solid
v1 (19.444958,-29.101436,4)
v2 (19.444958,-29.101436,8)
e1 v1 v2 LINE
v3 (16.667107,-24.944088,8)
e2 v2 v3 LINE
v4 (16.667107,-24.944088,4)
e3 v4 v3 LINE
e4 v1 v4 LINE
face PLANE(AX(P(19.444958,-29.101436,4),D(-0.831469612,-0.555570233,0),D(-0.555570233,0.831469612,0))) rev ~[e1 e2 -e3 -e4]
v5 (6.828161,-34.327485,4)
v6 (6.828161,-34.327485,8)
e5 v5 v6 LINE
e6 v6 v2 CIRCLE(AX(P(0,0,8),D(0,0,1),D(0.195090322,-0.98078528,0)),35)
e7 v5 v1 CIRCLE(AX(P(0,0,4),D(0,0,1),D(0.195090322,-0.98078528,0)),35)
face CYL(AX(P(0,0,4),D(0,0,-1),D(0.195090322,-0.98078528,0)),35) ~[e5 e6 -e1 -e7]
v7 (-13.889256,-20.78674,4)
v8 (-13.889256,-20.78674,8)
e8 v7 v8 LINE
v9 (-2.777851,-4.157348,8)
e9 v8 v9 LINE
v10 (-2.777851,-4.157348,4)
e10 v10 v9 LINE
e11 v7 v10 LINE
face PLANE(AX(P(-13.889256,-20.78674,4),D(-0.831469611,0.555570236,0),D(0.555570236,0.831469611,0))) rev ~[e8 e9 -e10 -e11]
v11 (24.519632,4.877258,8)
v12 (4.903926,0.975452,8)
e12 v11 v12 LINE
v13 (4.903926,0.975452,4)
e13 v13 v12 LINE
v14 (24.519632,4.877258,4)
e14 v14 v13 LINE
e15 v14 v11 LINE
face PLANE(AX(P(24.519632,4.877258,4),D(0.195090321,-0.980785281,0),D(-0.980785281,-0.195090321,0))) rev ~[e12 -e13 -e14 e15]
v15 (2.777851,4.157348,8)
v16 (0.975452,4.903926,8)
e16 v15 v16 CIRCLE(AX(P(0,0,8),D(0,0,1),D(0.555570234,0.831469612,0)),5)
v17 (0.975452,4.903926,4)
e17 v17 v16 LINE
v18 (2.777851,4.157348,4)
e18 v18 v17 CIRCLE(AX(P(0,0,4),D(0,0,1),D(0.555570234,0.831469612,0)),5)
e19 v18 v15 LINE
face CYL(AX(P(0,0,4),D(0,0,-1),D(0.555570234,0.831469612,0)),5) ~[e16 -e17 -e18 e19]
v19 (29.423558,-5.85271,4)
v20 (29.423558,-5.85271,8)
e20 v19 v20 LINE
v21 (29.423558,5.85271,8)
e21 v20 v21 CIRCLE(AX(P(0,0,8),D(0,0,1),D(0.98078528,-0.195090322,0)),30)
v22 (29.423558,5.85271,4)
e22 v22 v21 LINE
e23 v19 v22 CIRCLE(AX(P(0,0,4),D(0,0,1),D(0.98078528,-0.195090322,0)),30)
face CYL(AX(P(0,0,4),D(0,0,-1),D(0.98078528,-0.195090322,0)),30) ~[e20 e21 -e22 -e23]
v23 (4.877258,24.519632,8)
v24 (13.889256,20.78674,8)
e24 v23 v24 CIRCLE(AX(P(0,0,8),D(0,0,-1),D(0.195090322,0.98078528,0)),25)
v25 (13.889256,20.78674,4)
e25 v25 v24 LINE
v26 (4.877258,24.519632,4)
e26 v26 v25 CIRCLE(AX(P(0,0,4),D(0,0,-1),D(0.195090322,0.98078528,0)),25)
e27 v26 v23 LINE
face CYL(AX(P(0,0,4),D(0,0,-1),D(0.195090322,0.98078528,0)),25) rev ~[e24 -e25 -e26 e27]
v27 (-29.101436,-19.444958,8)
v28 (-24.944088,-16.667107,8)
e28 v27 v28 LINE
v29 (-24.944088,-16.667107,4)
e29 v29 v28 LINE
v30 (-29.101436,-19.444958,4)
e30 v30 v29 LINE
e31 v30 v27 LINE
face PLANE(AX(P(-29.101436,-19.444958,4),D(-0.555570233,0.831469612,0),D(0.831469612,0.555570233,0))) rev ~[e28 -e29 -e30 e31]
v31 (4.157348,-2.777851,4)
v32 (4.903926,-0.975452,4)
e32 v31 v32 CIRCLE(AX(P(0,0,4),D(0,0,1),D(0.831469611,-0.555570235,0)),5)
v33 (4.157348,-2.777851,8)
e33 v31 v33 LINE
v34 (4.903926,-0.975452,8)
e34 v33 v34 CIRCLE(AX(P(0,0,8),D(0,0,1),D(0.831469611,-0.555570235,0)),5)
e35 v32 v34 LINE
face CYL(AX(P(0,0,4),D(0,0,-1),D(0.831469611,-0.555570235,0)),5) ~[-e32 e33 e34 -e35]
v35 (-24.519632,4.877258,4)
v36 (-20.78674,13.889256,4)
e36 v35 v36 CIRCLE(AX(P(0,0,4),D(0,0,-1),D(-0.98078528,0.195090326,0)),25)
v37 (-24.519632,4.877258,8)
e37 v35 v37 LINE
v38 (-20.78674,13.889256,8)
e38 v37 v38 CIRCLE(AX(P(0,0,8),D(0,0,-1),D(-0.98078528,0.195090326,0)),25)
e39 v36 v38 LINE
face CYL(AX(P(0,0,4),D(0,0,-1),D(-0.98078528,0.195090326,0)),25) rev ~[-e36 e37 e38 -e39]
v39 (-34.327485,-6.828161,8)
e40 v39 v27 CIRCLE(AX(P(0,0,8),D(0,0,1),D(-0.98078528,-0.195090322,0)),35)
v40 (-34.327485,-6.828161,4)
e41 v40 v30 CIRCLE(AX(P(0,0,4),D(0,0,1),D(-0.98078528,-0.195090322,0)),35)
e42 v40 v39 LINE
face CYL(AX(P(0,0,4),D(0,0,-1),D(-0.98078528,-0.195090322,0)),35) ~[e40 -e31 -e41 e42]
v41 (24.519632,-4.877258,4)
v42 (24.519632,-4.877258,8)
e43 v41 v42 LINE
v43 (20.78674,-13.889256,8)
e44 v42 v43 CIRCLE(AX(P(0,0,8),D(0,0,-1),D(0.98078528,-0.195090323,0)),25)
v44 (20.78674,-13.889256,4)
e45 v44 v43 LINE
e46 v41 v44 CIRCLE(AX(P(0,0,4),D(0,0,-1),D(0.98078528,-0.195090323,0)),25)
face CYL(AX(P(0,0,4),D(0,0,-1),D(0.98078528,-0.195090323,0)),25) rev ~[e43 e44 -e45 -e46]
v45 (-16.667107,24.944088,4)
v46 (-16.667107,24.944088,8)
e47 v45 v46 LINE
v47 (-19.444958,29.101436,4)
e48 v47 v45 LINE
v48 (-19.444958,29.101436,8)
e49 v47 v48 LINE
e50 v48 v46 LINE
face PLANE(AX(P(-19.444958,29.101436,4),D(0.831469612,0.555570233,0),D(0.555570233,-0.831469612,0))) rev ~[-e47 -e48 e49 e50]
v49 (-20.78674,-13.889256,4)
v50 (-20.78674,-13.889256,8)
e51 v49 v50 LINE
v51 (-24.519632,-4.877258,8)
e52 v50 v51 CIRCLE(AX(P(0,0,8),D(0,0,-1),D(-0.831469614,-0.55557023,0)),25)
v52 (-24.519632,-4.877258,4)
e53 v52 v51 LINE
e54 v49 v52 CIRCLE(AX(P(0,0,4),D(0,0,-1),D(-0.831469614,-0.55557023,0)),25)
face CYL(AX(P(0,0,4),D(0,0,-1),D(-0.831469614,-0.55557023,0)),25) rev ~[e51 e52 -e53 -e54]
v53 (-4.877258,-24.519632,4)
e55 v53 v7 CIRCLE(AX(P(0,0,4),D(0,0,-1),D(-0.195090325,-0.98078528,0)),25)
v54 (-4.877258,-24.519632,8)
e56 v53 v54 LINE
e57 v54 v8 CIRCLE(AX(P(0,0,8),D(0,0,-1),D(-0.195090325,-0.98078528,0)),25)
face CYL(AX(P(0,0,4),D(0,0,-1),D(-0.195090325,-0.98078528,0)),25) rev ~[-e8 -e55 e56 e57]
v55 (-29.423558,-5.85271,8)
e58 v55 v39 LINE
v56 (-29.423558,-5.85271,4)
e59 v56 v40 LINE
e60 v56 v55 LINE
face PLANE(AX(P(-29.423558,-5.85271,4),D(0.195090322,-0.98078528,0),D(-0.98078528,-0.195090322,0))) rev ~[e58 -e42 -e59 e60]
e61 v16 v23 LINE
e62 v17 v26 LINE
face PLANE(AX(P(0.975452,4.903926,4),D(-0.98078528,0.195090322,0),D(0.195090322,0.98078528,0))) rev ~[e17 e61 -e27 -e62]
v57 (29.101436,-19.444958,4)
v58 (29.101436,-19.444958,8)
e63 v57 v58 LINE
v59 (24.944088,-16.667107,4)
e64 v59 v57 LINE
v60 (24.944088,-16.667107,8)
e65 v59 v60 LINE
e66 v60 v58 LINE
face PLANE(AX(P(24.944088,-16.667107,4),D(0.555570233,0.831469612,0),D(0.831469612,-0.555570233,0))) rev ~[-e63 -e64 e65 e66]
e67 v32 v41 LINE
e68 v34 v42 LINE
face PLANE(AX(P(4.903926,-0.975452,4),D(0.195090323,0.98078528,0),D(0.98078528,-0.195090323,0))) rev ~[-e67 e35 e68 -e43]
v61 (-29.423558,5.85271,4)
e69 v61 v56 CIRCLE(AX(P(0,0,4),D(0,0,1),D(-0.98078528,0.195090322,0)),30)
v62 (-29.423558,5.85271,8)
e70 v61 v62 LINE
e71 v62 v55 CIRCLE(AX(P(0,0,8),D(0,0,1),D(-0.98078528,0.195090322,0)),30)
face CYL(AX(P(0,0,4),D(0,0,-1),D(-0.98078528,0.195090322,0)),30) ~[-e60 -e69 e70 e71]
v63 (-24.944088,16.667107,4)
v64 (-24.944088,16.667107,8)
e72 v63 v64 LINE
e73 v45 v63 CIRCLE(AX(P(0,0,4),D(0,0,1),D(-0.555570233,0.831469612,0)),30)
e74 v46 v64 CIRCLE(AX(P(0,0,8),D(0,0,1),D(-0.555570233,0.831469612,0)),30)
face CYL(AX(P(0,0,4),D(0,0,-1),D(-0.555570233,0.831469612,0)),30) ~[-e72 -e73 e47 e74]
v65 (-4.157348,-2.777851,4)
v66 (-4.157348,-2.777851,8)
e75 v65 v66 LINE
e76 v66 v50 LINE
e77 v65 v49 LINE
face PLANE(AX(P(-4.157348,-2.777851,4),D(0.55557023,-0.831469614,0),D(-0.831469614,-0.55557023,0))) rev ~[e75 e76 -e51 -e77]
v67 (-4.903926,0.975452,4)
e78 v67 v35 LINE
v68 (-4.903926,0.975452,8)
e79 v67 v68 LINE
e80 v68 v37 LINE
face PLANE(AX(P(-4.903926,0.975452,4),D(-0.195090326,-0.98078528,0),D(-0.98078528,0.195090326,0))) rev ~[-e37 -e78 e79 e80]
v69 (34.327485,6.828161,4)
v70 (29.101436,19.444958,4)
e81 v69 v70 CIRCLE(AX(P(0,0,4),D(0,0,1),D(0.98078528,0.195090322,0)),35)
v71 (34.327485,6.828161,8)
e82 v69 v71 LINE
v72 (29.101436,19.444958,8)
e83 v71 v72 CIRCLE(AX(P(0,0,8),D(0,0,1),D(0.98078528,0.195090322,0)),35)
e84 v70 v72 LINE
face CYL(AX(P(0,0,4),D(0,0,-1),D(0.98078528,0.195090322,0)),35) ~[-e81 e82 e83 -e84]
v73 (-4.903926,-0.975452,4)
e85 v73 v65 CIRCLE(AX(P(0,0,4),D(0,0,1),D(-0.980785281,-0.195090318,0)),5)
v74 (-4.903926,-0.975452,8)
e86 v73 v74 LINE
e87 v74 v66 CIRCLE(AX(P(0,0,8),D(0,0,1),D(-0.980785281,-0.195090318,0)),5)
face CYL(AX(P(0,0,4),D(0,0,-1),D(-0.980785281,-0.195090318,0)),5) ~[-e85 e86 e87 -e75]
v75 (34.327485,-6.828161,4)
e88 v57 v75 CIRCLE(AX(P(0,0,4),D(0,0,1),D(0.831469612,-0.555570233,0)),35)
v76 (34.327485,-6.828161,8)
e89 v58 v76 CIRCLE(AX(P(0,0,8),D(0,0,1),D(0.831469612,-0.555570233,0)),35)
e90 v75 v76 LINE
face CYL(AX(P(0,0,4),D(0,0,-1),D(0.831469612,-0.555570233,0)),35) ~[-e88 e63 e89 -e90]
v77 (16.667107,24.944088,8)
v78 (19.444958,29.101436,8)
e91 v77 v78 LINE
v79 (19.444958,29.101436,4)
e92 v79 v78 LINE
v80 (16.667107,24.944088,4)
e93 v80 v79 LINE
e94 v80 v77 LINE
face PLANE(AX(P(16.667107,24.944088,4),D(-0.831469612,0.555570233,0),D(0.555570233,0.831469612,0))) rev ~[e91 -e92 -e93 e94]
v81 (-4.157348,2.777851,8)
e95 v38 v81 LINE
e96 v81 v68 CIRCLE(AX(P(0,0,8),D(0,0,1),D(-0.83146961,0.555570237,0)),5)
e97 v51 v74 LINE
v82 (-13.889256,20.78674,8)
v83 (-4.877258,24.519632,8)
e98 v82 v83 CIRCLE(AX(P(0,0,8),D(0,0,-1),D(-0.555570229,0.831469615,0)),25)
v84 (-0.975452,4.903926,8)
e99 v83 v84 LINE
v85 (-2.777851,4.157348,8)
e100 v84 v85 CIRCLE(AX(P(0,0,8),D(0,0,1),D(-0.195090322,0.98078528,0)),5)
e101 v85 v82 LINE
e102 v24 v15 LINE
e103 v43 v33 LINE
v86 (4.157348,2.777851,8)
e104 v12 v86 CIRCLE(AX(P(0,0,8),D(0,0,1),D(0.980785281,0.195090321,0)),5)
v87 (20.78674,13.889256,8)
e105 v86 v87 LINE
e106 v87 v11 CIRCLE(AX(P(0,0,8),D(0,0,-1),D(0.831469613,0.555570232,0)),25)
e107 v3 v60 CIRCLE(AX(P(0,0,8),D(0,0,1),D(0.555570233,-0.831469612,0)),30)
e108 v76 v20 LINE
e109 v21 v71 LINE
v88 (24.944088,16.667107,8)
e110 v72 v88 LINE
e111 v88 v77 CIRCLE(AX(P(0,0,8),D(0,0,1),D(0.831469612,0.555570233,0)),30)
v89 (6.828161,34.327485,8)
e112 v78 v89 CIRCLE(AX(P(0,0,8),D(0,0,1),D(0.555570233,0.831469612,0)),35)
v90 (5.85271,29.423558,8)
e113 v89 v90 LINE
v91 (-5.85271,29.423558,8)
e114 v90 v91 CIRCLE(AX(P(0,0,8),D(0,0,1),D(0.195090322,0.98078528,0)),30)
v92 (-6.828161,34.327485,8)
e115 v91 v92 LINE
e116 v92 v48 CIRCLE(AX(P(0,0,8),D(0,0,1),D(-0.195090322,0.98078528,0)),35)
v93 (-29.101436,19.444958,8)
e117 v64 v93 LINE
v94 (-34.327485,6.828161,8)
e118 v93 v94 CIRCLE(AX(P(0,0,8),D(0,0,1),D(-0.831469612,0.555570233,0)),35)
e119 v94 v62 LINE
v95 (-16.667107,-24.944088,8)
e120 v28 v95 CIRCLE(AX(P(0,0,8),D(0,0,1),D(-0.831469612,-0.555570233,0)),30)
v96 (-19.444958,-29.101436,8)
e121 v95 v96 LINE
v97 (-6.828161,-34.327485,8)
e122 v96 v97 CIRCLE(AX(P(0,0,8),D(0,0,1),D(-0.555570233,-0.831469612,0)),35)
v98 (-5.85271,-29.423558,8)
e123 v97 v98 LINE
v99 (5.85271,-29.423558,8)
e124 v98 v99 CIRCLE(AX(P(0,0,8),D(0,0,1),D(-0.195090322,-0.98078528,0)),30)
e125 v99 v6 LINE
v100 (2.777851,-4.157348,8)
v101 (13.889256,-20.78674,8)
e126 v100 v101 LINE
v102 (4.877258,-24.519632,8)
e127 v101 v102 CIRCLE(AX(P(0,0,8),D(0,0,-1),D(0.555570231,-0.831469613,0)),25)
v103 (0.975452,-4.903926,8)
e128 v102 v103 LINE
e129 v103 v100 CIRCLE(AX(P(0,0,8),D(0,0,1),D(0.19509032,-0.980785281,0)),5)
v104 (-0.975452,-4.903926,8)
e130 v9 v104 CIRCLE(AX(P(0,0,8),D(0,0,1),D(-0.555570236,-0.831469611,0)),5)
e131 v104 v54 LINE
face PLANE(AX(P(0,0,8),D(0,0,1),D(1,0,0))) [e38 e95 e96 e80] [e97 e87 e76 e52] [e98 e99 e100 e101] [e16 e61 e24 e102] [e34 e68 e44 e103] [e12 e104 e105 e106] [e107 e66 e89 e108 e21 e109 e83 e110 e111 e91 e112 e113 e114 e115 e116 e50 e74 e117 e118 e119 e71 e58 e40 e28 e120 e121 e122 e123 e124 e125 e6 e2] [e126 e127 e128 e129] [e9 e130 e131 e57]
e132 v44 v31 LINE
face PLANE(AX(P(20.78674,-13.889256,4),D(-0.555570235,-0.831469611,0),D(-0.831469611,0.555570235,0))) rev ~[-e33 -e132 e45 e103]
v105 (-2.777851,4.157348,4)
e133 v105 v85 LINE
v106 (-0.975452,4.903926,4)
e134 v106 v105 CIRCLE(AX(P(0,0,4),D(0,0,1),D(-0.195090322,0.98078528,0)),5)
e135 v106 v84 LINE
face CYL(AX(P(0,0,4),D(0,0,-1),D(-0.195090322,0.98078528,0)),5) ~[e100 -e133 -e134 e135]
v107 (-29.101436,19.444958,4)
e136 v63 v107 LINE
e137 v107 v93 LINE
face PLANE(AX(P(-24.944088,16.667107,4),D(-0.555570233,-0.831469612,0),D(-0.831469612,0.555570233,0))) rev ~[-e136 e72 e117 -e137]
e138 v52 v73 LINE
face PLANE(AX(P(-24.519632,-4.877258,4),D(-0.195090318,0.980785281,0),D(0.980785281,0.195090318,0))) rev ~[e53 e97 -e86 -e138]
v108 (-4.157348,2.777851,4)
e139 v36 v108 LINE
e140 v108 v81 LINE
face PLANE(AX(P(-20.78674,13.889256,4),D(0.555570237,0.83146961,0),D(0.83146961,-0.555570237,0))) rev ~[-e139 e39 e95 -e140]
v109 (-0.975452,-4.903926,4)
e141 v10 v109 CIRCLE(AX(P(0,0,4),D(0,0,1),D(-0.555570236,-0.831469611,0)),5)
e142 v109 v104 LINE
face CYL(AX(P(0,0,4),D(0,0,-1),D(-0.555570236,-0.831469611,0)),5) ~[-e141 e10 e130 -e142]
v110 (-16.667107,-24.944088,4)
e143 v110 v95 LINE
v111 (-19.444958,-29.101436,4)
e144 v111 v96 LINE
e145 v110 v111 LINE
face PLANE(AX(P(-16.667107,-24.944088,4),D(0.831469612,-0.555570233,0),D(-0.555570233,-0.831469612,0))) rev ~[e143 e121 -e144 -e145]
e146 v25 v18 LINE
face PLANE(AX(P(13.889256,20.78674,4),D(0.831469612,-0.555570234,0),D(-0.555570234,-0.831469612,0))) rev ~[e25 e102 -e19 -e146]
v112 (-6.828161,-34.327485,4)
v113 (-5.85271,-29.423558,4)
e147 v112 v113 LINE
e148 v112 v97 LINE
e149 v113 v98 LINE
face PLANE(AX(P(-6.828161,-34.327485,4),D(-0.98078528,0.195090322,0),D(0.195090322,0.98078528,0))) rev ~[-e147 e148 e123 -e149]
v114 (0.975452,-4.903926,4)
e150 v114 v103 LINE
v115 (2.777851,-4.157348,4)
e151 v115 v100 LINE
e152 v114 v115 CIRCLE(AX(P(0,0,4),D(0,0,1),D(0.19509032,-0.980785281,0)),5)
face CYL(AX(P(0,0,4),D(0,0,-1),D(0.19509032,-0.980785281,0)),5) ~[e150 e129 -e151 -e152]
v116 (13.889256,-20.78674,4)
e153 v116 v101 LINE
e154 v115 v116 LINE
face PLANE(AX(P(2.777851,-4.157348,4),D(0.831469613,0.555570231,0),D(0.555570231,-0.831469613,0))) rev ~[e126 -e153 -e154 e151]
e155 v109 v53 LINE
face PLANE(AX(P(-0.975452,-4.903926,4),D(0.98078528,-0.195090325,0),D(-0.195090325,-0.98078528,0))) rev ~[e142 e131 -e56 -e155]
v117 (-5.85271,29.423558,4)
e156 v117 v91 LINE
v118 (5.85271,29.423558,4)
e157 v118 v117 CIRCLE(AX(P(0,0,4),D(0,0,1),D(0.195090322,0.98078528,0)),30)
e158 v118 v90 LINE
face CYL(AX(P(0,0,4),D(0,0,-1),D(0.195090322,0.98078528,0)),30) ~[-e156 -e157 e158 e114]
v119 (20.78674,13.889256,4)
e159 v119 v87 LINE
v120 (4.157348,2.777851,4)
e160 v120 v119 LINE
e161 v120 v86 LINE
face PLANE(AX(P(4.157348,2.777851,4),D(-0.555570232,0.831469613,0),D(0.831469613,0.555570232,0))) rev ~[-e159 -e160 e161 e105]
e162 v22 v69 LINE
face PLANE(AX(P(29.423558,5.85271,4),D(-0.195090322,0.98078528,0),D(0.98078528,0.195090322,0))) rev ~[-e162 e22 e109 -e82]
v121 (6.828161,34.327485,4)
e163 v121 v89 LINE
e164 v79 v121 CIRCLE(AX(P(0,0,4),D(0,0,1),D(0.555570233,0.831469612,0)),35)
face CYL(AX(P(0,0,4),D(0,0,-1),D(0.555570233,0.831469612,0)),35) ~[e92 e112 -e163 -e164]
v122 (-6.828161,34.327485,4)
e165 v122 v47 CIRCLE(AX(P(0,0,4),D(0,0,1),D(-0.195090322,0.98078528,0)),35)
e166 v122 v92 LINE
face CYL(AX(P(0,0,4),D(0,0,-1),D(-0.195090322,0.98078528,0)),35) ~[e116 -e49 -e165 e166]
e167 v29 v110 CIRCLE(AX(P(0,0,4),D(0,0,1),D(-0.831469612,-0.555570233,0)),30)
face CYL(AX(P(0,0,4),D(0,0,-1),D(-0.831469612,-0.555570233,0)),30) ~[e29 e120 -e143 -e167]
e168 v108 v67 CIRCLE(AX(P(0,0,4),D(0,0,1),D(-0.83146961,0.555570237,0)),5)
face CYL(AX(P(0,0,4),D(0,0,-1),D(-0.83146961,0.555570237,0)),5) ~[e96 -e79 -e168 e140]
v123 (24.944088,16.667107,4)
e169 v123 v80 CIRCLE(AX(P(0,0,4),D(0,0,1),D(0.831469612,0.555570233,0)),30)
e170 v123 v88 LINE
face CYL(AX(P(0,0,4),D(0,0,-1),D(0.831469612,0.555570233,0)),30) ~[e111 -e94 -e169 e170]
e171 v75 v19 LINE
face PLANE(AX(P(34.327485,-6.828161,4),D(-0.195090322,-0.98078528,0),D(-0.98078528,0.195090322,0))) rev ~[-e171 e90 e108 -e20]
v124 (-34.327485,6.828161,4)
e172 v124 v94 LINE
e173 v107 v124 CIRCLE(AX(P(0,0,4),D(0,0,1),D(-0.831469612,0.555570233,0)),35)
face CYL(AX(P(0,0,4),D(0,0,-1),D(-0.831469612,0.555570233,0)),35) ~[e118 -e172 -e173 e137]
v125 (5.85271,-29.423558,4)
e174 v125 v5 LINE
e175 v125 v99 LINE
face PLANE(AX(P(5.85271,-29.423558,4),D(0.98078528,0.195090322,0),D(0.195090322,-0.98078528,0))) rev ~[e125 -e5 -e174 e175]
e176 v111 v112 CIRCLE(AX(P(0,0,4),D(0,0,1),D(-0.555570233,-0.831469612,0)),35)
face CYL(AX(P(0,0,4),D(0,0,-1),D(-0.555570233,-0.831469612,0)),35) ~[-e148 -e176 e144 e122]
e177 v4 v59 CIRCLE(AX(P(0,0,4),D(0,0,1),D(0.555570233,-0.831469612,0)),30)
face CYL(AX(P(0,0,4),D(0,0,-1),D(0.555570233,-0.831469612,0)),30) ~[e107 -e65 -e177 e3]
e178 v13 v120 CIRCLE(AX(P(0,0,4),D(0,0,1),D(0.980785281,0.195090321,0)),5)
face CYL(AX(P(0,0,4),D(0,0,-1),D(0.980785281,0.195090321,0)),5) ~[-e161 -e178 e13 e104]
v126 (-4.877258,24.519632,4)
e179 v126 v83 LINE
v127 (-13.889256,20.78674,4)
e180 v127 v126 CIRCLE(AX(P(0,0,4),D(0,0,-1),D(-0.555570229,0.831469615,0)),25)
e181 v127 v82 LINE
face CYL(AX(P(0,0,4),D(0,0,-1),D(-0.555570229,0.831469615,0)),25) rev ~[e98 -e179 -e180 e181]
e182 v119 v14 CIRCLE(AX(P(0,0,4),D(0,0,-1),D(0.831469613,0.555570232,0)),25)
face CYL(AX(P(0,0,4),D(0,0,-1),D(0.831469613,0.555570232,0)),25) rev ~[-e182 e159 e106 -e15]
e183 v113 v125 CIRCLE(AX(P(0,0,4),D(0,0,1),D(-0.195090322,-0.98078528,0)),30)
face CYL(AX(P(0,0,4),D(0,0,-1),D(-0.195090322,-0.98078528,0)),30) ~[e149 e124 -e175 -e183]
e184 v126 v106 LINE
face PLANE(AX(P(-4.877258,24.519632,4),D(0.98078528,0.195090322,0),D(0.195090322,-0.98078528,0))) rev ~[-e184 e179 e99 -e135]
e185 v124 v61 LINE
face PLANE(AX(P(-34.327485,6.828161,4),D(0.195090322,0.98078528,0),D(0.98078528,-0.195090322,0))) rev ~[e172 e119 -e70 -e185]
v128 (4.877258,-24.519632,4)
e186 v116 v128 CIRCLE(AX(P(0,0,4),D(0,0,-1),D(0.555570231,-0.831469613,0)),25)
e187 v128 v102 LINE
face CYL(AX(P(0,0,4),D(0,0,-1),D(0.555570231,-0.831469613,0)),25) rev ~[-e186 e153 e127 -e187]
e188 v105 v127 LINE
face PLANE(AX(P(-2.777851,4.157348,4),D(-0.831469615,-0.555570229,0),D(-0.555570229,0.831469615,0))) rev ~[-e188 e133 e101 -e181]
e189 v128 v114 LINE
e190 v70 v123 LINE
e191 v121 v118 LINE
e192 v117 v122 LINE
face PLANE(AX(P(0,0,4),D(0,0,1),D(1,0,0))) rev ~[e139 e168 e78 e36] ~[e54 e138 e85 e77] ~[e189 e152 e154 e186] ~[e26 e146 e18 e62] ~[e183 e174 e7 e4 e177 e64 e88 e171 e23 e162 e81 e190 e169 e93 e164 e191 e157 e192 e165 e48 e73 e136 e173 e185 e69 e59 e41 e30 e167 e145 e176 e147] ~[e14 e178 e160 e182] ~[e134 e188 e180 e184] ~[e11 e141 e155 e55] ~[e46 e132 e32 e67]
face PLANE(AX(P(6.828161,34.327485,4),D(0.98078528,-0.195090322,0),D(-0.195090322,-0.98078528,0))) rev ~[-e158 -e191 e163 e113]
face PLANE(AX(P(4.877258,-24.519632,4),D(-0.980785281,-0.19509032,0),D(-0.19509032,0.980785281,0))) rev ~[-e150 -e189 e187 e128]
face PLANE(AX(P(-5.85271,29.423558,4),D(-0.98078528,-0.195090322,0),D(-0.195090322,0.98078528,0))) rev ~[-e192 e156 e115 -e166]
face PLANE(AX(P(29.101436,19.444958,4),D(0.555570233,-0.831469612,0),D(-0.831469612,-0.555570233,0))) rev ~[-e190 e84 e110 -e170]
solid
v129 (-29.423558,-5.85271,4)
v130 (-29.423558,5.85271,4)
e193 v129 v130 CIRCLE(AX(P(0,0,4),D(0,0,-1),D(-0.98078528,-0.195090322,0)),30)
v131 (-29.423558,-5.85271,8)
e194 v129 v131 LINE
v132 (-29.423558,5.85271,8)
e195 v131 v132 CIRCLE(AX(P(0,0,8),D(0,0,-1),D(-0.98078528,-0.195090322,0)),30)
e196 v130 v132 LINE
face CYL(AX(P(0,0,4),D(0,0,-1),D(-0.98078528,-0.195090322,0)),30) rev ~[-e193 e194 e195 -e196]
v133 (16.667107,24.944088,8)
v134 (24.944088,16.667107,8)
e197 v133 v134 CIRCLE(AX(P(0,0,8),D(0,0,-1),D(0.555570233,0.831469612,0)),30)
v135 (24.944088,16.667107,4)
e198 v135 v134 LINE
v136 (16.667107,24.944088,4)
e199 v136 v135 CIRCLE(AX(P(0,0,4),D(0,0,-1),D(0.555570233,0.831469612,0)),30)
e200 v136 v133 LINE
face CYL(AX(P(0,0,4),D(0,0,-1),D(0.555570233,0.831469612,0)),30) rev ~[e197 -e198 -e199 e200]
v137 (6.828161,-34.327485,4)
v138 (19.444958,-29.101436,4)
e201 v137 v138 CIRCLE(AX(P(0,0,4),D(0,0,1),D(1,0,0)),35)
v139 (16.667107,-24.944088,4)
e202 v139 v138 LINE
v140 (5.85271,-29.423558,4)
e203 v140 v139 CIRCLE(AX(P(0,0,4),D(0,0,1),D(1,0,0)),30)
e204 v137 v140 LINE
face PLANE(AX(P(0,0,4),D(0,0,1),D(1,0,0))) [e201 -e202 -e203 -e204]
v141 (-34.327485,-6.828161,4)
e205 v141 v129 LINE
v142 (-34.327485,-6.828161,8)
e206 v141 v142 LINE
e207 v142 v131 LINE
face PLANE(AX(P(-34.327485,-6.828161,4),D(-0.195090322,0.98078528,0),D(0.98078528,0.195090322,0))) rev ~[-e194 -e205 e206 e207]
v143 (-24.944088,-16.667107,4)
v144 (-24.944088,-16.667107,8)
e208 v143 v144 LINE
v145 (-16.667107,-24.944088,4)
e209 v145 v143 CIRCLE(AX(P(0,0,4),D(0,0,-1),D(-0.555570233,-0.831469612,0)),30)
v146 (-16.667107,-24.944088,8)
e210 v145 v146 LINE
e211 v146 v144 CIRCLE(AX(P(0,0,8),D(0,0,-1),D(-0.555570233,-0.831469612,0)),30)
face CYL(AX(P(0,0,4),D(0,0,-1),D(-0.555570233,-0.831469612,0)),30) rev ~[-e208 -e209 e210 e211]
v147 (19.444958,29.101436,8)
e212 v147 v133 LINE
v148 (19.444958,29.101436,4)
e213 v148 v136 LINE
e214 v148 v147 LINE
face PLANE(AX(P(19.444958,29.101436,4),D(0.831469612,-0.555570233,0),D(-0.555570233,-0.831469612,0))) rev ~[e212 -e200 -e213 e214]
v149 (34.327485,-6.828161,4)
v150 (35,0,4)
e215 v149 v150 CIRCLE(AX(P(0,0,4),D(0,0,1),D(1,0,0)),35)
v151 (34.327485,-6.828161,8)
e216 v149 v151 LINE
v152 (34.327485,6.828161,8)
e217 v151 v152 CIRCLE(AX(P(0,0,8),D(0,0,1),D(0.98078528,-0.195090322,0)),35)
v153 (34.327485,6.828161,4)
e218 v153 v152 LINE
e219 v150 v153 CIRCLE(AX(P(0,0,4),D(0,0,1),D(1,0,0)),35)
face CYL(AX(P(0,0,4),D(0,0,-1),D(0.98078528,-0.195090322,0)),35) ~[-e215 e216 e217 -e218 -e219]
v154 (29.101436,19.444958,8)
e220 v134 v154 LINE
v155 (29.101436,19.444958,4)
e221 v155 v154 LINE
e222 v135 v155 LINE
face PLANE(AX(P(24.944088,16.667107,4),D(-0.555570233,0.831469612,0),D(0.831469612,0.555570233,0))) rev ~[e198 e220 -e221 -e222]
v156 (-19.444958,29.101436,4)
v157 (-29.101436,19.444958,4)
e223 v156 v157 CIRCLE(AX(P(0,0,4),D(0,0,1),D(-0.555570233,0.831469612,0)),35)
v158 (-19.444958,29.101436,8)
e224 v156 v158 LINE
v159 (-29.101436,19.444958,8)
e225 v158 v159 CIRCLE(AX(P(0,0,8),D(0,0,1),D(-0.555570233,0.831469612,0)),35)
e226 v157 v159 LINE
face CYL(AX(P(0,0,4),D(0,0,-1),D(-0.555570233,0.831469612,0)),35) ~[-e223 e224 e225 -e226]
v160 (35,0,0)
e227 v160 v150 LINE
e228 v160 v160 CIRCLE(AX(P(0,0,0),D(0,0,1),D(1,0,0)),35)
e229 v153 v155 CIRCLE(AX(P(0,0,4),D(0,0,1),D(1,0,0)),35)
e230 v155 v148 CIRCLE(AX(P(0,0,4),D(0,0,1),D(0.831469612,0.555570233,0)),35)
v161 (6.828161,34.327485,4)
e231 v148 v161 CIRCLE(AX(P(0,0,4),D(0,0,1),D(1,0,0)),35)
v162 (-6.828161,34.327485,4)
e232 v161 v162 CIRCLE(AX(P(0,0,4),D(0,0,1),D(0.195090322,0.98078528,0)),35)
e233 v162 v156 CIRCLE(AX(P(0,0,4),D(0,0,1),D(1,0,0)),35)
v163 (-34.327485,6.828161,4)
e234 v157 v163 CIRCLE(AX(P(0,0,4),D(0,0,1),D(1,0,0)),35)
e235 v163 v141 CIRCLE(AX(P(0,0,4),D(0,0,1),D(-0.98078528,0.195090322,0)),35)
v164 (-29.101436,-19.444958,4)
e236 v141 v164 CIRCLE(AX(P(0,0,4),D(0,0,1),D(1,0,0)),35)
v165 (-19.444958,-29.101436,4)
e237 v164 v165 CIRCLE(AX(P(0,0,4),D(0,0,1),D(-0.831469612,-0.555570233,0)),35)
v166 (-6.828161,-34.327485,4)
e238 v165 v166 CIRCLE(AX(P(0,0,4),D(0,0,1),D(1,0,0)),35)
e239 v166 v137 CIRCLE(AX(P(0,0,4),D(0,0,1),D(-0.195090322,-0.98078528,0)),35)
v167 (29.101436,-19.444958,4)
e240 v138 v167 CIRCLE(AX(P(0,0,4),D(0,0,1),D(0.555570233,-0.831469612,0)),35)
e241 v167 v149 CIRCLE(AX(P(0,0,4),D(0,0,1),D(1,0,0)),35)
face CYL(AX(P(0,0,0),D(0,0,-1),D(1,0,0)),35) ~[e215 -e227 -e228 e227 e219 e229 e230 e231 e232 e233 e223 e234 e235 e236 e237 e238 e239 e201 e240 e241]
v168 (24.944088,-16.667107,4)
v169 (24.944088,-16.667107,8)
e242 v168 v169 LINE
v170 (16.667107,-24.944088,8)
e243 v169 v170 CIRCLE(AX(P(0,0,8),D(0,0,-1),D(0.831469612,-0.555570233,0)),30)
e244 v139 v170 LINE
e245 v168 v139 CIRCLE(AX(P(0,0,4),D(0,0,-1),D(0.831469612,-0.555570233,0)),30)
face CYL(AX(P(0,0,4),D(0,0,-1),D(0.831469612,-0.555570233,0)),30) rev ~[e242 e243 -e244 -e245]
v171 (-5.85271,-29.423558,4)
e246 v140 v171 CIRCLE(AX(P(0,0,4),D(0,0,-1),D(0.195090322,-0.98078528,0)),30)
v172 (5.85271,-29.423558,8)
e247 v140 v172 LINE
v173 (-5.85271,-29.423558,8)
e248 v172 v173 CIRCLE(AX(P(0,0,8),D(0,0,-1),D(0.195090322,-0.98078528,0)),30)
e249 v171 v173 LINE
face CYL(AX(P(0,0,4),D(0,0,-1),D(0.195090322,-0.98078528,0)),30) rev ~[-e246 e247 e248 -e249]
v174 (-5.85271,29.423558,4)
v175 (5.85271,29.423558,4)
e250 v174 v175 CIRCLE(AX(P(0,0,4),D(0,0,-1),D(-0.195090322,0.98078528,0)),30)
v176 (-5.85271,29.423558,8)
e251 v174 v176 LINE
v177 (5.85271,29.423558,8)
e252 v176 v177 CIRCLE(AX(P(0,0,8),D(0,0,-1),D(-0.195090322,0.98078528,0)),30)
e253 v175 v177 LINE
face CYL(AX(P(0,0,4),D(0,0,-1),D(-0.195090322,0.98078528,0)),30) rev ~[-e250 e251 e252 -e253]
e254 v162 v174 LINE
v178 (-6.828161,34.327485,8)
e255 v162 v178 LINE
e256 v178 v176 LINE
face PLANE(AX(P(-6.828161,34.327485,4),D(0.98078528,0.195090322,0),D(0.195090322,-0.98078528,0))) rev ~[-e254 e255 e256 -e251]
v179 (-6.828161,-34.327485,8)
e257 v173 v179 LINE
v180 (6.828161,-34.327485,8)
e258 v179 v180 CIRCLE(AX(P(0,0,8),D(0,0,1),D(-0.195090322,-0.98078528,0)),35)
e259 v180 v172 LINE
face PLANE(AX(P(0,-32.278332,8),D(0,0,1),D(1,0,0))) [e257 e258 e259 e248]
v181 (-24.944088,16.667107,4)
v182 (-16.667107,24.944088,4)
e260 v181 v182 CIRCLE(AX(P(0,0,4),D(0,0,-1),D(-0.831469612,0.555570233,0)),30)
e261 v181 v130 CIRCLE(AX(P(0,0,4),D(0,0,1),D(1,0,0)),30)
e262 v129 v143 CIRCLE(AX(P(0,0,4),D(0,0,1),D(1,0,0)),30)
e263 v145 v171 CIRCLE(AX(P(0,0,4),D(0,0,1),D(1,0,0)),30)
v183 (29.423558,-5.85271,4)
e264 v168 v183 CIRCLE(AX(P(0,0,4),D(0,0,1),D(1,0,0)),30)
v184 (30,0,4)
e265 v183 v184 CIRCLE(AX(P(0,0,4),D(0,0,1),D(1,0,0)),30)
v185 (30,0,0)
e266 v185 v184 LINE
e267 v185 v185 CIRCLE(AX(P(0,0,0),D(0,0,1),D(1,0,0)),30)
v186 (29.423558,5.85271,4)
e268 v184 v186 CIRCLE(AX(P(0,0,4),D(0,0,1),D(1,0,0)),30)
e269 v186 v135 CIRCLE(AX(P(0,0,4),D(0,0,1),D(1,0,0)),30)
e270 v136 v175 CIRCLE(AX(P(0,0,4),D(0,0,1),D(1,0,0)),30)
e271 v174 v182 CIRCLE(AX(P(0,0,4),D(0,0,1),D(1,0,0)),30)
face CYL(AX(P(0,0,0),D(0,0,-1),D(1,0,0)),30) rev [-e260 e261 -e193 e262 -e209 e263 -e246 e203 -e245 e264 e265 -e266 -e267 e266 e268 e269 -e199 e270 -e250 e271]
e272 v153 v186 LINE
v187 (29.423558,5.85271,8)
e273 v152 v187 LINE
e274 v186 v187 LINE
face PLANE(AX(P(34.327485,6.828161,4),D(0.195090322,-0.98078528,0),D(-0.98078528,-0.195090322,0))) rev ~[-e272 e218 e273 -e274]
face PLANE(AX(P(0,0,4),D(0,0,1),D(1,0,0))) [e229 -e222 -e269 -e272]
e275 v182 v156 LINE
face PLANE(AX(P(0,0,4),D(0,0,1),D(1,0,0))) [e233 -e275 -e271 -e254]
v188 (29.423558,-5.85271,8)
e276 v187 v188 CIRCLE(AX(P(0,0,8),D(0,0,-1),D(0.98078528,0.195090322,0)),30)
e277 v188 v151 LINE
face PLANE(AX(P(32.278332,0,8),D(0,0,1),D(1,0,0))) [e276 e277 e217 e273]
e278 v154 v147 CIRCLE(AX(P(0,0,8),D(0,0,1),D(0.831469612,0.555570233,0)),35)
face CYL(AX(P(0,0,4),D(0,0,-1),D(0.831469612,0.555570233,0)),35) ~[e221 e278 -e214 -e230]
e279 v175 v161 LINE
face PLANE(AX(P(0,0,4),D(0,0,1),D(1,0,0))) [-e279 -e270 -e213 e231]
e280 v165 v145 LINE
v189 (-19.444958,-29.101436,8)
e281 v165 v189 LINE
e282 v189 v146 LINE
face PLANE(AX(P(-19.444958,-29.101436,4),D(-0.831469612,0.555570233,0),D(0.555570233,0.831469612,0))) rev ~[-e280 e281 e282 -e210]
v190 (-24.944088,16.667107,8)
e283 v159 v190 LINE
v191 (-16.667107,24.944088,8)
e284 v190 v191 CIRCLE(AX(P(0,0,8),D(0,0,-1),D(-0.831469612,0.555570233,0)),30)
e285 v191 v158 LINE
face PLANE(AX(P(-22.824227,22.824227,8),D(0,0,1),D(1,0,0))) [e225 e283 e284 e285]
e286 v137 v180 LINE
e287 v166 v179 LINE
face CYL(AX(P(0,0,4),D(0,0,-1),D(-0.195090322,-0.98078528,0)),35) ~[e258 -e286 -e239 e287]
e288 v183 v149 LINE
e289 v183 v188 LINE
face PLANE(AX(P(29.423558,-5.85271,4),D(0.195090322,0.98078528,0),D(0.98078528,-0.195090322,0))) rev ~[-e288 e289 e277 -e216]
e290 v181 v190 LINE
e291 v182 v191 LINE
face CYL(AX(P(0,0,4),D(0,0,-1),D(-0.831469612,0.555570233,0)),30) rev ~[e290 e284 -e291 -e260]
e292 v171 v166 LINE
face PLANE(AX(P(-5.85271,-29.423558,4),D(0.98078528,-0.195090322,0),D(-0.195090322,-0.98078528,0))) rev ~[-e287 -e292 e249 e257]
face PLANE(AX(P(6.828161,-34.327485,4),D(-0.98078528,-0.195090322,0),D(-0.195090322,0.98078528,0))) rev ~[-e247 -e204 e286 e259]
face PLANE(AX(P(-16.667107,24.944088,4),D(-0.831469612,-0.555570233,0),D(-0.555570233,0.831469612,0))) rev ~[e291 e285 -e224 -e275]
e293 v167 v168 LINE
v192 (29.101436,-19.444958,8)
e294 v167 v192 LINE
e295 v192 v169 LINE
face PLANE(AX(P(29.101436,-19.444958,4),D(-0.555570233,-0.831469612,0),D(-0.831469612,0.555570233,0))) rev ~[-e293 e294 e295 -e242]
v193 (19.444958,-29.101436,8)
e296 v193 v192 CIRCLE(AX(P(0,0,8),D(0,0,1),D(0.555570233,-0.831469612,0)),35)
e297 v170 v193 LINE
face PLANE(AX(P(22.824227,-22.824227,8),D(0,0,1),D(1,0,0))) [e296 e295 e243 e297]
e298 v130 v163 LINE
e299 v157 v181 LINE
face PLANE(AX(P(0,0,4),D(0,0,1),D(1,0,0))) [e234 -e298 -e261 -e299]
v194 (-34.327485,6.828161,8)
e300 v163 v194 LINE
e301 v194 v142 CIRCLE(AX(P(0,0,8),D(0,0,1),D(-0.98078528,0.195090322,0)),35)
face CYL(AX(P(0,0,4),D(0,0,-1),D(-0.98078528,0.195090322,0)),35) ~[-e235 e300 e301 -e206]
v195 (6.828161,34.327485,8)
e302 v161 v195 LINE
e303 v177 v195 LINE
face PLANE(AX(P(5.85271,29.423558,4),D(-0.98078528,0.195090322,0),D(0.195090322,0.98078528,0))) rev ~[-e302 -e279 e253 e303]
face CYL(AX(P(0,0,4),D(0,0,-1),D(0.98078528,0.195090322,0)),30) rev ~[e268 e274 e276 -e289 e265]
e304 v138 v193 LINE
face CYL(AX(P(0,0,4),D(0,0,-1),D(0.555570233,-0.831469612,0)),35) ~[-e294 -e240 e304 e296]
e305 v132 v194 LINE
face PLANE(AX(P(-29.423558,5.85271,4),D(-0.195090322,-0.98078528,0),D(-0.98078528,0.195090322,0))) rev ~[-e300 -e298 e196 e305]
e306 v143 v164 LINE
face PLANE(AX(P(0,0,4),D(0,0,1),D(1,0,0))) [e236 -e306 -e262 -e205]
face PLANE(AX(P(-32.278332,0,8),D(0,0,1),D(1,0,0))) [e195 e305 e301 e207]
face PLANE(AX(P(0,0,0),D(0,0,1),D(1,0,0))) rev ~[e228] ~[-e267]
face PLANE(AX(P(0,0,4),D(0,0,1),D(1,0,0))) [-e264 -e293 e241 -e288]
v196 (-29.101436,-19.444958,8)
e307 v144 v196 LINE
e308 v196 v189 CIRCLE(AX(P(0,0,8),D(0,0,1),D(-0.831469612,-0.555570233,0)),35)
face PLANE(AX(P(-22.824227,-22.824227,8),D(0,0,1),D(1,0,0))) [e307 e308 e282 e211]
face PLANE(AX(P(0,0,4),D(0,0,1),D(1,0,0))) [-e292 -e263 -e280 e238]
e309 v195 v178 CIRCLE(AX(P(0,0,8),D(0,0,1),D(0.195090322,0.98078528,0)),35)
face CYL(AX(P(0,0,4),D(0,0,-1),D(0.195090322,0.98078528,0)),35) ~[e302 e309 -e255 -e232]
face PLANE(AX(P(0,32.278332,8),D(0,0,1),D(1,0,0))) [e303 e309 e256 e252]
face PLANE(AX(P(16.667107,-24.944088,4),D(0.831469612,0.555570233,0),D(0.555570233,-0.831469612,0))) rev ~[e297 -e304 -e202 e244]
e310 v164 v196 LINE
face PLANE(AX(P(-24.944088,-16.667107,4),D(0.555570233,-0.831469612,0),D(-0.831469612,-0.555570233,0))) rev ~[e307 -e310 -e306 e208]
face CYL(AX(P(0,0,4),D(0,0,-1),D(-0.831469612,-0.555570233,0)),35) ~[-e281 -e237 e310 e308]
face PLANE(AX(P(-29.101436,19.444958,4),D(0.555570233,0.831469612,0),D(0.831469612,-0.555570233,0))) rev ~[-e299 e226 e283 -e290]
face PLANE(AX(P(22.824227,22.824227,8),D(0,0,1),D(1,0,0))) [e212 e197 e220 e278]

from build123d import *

# Parameters (mm, degrees)
F0_R     = 35
F0_R_2   = 30
F1_DEPTH = 4
F3_DEPTH = 4
F5_DEPTH = 4


# Not quite as in the source:
# - after a boolean that leaves OpenCascade's solid faulty, fix() repairs it


with BuildPart() as f1:
    # F0 (on Top) → F1 (new body)
    with BuildSketch(Plane.XY):
        Circle(F0_R)
        Circle(F0_R_2, mode=Mode.SUBTRACT)
    extrude(amount=F1_DEPTH)

    # F2 (on face) → F3 (join)
    with BuildSketch(Plane.XY.offset(4)):
        with BuildLine():
            Line((-6.8281612706, 34.3274848141), (-5.8527096605, 29.4235584121))
            ThreePointArc((-5.8527096605, 29.4235584121), (0, 30), (5.8527096605, 29.4235584121))
            Line((5.8527096605, 29.4235584121), (6.8281612706, 34.3274848141))
            ThreePointArc((6.8281612706, 34.3274848141), (0, 35), (-6.8281612706, 34.3274848141))
        make_face()
        with BuildLine():
            ThreePointArc((-24.9440883691, 16.6671069906), (-21.2132034356, 21.2132034356), (-16.6671069906, 24.9440883691))
            Line((-16.6671069906, 24.9440883691), (-19.4449581557, 29.1014364306))
            ThreePointArc((-19.4449581557, 29.1014364306), (-24.7487373415, 24.7487373415), (-29.1014364306, 19.4449581557))
            Line((-29.1014364306, 19.4449581557), (-24.9440883691, 16.6671069906))
        make_face()
        with BuildLine():
            ThreePointArc((-29.4235584121, -5.8527096605), (-30, 0), (-29.4235584121, 5.8527096605))
            Line((-29.4235584121, 5.8527096605), (-34.3274848141, 6.8281612706))
            ThreePointArc((-34.3274848141, 6.8281612706), (-35, 0), (-34.3274848141, -6.8281612706))
            Line((-34.3274848141, -6.8281612706), (-29.4235584121, -5.8527096605))
        make_face()
        with BuildLine():
            ThreePointArc((-16.6671069906, -24.9440883691), (-21.2132034356, -21.2132034356), (-24.9440883691, -16.6671069906))
            Line((-24.9440883691, -16.6671069906), (-29.1014364306, -19.4449581557))
            ThreePointArc((-29.1014364306, -19.4449581557), (-24.7487373415, -24.7487373415), (-19.4449581557, -29.1014364306))
            Line((-19.4449581557, -29.1014364306), (-16.6671069906, -24.9440883691))
        make_face()
        with BuildLine():
            ThreePointArc((5.8527096605, -29.4235584121), (0, -30), (-5.8527096605, -29.4235584121))
            Line((-5.8527096605, -29.4235584121), (-6.8281612706, -34.3274848141))
            ThreePointArc((-6.8281612706, -34.3274848141), (0, -35), (6.8281612706, -34.3274848141))
            Line((6.8281612706, -34.3274848141), (5.8527096605, -29.4235584121))
        make_face()
        with BuildLine():
            ThreePointArc((24.9440883691, -16.6671069906), (21.2132034356, -21.2132034356), (16.6671069906, -24.9440883691))
            Line((16.6671069906, -24.9440883691), (19.4449581557, -29.1014364306))
            ThreePointArc((19.4449581557, -29.1014364306), (24.7487373415, -24.7487373415), (29.1014364306, -19.4449581557))
            Line((29.1014364306, -19.4449581557), (24.9440883691, -16.6671069906))
        make_face()
        with BuildLine():
            ThreePointArc((29.4235584121, 5.8527096605), (30, 0), (29.4235584121, -5.8527096605))
            Line((29.4235584121, -5.8527096605), (34.3274848141, -6.8281612706))
            ThreePointArc((34.3274848141, -6.8281612706), (35, 0), (34.3274848141, 6.8281612706))
            Line((34.3274848141, 6.8281612706), (29.4235584121, 5.8527096605))
        make_face()
        with BuildLine():
            ThreePointArc((16.6671069906, 24.9440883691), (21.2132034356, 21.2132034356), (24.9440883691, 16.6671069906))
            Line((24.9440883691, 16.6671069906), (29.1014364306, 19.4449581557))
            ThreePointArc((29.1014364306, 19.4449581557), (24.7487373415, 24.7487373415), (19.4449581557, 29.1014364306))
            Line((19.4449581557, 29.1014364306), (16.6671069906, 24.9440883691))
        make_face()
    extrude(amount=F3_DEPTH)

    add(f1.part.fix(), mode=Mode.REPLACE)


with BuildPart() as f5:
    # F4 (on face) → F5 (new body)
    with BuildSketch(Plane.XY.offset(4)):
        with BuildLine():
            Line((-24.9440883691, 16.6671069906), (-29.1014364306, 19.4449581557))
            ThreePointArc((-29.1014364306, 19.4449581557), (-32.3357836379, 13.3939201328), (-34.3274848141, 6.8281612706))
            Line((-34.3274848141, 6.8281612706), (-29.4235584121, 5.8527096605))
            ThreePointArc((-29.4235584121, 5.8527096605), (-30, 0), (-29.4235584121, -5.8527096605))
            Line((-29.4235584121, -5.8527096605), (-34.3274848141, -6.8281612706))
            ThreePointArc((-34.3274848141, -6.8281612706), (-32.3357836379, -13.3939201328), (-29.1014364306, -19.4449581557))
            Line((-29.1014364306, -19.4449581557), (-24.9440883691, -16.6671069906))
            ThreePointArc((-24.9440883691, -16.6671069906), (-21.2132034356, -21.2132034356), (-16.6671069906, -24.9440883691))
            Line((-16.6671069906, -24.9440883691), (-19.4449581557, -29.1014364306))
            ThreePointArc((-19.4449581557, -29.1014364306), (-13.3939201328, -32.3357836379), (-6.8281612706, -34.3274848141))
            Line((-6.8281612706, -34.3274848141), (-5.8527096605, -29.4235584121))
            ThreePointArc((-5.8527096605, -29.4235584121), (0, -30), (5.8527096605, -29.4235584121))
            Line((5.8527096605, -29.4235584121), (6.8281612706, -34.3274848141))
            ThreePointArc((6.8281612706, -34.3274848141), (13.3939201328, -32.3357836379), (19.4449581557, -29.1014364306))
            Line((19.4449581557, -29.1014364306), (16.6671069906, -24.9440883691))
            ThreePointArc((16.6671069906, -24.9440883691), (21.2132034356, -21.2132034356), (24.9440883691, -16.6671069906))
            Line((24.9440883691, -16.6671069906), (29.1014364306, -19.4449581557))
            ThreePointArc((29.1014364306, -19.4449581557), (32.3357836379, -13.3939201328), (34.3274848141, -6.8281612706))
            Line((34.3274848141, -6.8281612706), (29.4235584121, -5.8527096605))
            ThreePointArc((29.4235584121, -5.8527096605), (30, 0), (29.4235584121, 5.8527096605))
            Line((29.4235584121, 5.8527096605), (34.3274848141, 6.8281612706))
            ThreePointArc((34.3274848141, 6.8281612706), (32.3357836379, 13.3939201328), (29.1014364306, 19.4449581557))
            Line((29.1014364306, 19.4449581557), (24.9440883691, 16.6671069906))
            ThreePointArc((24.9440883691, 16.6671069906), (21.2132034356, 21.2132034356), (16.6671069906, 24.9440883691))
            Line((16.6671069906, 24.9440883691), (19.4449581557, 29.1014364306))
            ThreePointArc((19.4449581557, 29.1014364306), (13.3939201328, 32.3357836379), (6.8281612706, 34.3274848141))
            Line((6.8281612706, 34.3274848141), (5.8527096605, 29.4235584121))
            ThreePointArc((5.8527096605, 29.4235584121), (0, 30), (-5.8527096605, 29.4235584121))
            Line((-5.8527096605, 29.4235584121), (-6.8281612706, 34.3274848141))
            ThreePointArc((-6.8281612706, 34.3274848141), (-13.3939201328, 32.3357836379), (-19.4449581557, 29.1014364306))
            Line((-19.4449581557, 29.1014364306), (-16.6671069906, 24.9440883691))
            ThreePointArc((-16.6671069906, 24.9440883691), (-21.2132034356, 21.2132034356), (-24.9440883691, 16.6671069906))
        make_face()
        with BuildLine():
            ThreePointArc((-2.7778511776, -4.1573480531), (-1.913417175, -4.6193976571), (-0.9754516234, -4.9039263994))
            Line((-0.9754516234, -4.9039263994), (-4.8772581169, -24.5196319969))
            ThreePointArc((-4.8772581169, -24.5196319969), (-9.5670858752, -23.0969882854), (-13.8892558881, -20.7867402657))
            Line((-13.8892558881, -20.7867402657), (-2.7778511776, -4.1573480531))
        make_face(mode=Mode.SUBTRACT)
        with BuildLine():
            ThreePointArc((-4.9039264055, -0.9754515924), (-4.6193976692, -1.9134171458), (-4.1573480707, -2.7778511513))
            Line((-4.1573480707, -2.7778511513), (-20.7867403536, -13.8892557566))
            ThreePointArc((-20.7867403536, -13.8892557566), (-23.0969883459, -9.5670857291), (-24.5196320277, -4.8772579618))
            Line((-24.5196320277, -4.8772579618), (-4.9039264055, -0.9754515924))
        make_face(mode=Mode.SUBTRACT)
        with BuildLine():
            ThreePointArc((0.9754515983, -4.9039264044), (1.9134171514, -4.6193976669), (2.7778511563, -4.1573480674))
            Line((2.7778511563, -4.1573480674), (13.8892557817, -20.7867403369))
            ThreePointArc((13.8892557817, -20.7867403369), (9.5670857569, -23.0969883344), (4.8772579913, -24.5196320218))
            Line((4.8772579913, -24.5196320218), (0.9754515983, -4.9039264044))
        make_face(mode=Mode.SUBTRACT)
        with BuildLine():
            Line((20.7867402825, -13.8892558631), (4.1573480565, -2.7778511726))
            ThreePointArc((4.1573480565, -2.7778511726), (4.6193976594, -1.9134171695), (4.9039264005, -0.9754516175))
            Line((4.9039264005, -0.9754516175), (24.5196320027, -4.8772580873))
            ThreePointArc((24.5196320027, -4.8772580873), (23.0969882969, -9.5670858474), (20.7867402825, -13.8892558631))
        make_face(mode=Mode.SUBTRACT)
        with BuildLine():
            ThreePointArc((-4.1573480498, 2.7778511826), (-4.6193976548, 1.9134171806), (-4.9039263982, 0.9754516293))
            Line((-4.9039263982, 0.9754516293), (-24.519631991, 4.8772581464))
            ThreePointArc((-24.519631991, 4.8772581464), (-23.0969882739, 9.5670859031), (-20.786740249, 13.8892559132))
            Line((-20.786740249, 13.8892559132), (-4.1573480498, 2.7778511826))
        make_face(mode=Mode.SUBTRACT)
        with BuildLine():
            ThreePointArc((-13.8892557316, 20.7867403703), (-9.5670857569, 23.0969883344), (-4.8772580504, 24.5196320101))
            Line((-4.8772580504, 24.5196320101), (-0.9754516101, 4.903926402))
            ThreePointArc((-0.9754516101, 4.903926402), (-1.9134171514, 4.6193976669), (-2.7778511463, 4.1573480741))
            Line((-2.7778511463, 4.1573480741), (-13.8892557316, 20.7867403703))
        make_face(mode=Mode.SUBTRACT)
        with BuildLine():
            ThreePointArc((4.9039264032, 0.9754516042), (4.6193976646, 1.913417157), (4.157348064, 2.7778511613))
            Line((4.157348064, 2.7778511613), (20.7867403201, 13.8892558067))
            ThreePointArc((20.7867403201, 13.8892558067), (23.0969883229, 9.5670857848), (24.519632016, 4.8772580209))
            Line((24.519632016, 4.8772580209), (4.9039264032, 0.9754516042))
        make_face(mode=Mode.SUBTRACT)
        with BuildLine():
            ThreePointArc((2.7778511676, 4.1573480598), (1.9134171639, 4.6193976617), (0.9754516116, 4.9039264017))
            Line((0.9754516116, 4.9039264017), (4.8772580578, 24.5196320086))
            ThreePointArc((4.8772580578, 24.5196320086), (9.5670858196, 23.0969883085), (13.889255838, 20.7867402992))
            Line((13.889255838, 20.7867402992), (2.7778511676, 4.1573480598))
        make_face(mode=Mode.SUBTRACT)
    extrude(amount=F5_DEPTH)


solid = Compound([f1.part, f5.part])
